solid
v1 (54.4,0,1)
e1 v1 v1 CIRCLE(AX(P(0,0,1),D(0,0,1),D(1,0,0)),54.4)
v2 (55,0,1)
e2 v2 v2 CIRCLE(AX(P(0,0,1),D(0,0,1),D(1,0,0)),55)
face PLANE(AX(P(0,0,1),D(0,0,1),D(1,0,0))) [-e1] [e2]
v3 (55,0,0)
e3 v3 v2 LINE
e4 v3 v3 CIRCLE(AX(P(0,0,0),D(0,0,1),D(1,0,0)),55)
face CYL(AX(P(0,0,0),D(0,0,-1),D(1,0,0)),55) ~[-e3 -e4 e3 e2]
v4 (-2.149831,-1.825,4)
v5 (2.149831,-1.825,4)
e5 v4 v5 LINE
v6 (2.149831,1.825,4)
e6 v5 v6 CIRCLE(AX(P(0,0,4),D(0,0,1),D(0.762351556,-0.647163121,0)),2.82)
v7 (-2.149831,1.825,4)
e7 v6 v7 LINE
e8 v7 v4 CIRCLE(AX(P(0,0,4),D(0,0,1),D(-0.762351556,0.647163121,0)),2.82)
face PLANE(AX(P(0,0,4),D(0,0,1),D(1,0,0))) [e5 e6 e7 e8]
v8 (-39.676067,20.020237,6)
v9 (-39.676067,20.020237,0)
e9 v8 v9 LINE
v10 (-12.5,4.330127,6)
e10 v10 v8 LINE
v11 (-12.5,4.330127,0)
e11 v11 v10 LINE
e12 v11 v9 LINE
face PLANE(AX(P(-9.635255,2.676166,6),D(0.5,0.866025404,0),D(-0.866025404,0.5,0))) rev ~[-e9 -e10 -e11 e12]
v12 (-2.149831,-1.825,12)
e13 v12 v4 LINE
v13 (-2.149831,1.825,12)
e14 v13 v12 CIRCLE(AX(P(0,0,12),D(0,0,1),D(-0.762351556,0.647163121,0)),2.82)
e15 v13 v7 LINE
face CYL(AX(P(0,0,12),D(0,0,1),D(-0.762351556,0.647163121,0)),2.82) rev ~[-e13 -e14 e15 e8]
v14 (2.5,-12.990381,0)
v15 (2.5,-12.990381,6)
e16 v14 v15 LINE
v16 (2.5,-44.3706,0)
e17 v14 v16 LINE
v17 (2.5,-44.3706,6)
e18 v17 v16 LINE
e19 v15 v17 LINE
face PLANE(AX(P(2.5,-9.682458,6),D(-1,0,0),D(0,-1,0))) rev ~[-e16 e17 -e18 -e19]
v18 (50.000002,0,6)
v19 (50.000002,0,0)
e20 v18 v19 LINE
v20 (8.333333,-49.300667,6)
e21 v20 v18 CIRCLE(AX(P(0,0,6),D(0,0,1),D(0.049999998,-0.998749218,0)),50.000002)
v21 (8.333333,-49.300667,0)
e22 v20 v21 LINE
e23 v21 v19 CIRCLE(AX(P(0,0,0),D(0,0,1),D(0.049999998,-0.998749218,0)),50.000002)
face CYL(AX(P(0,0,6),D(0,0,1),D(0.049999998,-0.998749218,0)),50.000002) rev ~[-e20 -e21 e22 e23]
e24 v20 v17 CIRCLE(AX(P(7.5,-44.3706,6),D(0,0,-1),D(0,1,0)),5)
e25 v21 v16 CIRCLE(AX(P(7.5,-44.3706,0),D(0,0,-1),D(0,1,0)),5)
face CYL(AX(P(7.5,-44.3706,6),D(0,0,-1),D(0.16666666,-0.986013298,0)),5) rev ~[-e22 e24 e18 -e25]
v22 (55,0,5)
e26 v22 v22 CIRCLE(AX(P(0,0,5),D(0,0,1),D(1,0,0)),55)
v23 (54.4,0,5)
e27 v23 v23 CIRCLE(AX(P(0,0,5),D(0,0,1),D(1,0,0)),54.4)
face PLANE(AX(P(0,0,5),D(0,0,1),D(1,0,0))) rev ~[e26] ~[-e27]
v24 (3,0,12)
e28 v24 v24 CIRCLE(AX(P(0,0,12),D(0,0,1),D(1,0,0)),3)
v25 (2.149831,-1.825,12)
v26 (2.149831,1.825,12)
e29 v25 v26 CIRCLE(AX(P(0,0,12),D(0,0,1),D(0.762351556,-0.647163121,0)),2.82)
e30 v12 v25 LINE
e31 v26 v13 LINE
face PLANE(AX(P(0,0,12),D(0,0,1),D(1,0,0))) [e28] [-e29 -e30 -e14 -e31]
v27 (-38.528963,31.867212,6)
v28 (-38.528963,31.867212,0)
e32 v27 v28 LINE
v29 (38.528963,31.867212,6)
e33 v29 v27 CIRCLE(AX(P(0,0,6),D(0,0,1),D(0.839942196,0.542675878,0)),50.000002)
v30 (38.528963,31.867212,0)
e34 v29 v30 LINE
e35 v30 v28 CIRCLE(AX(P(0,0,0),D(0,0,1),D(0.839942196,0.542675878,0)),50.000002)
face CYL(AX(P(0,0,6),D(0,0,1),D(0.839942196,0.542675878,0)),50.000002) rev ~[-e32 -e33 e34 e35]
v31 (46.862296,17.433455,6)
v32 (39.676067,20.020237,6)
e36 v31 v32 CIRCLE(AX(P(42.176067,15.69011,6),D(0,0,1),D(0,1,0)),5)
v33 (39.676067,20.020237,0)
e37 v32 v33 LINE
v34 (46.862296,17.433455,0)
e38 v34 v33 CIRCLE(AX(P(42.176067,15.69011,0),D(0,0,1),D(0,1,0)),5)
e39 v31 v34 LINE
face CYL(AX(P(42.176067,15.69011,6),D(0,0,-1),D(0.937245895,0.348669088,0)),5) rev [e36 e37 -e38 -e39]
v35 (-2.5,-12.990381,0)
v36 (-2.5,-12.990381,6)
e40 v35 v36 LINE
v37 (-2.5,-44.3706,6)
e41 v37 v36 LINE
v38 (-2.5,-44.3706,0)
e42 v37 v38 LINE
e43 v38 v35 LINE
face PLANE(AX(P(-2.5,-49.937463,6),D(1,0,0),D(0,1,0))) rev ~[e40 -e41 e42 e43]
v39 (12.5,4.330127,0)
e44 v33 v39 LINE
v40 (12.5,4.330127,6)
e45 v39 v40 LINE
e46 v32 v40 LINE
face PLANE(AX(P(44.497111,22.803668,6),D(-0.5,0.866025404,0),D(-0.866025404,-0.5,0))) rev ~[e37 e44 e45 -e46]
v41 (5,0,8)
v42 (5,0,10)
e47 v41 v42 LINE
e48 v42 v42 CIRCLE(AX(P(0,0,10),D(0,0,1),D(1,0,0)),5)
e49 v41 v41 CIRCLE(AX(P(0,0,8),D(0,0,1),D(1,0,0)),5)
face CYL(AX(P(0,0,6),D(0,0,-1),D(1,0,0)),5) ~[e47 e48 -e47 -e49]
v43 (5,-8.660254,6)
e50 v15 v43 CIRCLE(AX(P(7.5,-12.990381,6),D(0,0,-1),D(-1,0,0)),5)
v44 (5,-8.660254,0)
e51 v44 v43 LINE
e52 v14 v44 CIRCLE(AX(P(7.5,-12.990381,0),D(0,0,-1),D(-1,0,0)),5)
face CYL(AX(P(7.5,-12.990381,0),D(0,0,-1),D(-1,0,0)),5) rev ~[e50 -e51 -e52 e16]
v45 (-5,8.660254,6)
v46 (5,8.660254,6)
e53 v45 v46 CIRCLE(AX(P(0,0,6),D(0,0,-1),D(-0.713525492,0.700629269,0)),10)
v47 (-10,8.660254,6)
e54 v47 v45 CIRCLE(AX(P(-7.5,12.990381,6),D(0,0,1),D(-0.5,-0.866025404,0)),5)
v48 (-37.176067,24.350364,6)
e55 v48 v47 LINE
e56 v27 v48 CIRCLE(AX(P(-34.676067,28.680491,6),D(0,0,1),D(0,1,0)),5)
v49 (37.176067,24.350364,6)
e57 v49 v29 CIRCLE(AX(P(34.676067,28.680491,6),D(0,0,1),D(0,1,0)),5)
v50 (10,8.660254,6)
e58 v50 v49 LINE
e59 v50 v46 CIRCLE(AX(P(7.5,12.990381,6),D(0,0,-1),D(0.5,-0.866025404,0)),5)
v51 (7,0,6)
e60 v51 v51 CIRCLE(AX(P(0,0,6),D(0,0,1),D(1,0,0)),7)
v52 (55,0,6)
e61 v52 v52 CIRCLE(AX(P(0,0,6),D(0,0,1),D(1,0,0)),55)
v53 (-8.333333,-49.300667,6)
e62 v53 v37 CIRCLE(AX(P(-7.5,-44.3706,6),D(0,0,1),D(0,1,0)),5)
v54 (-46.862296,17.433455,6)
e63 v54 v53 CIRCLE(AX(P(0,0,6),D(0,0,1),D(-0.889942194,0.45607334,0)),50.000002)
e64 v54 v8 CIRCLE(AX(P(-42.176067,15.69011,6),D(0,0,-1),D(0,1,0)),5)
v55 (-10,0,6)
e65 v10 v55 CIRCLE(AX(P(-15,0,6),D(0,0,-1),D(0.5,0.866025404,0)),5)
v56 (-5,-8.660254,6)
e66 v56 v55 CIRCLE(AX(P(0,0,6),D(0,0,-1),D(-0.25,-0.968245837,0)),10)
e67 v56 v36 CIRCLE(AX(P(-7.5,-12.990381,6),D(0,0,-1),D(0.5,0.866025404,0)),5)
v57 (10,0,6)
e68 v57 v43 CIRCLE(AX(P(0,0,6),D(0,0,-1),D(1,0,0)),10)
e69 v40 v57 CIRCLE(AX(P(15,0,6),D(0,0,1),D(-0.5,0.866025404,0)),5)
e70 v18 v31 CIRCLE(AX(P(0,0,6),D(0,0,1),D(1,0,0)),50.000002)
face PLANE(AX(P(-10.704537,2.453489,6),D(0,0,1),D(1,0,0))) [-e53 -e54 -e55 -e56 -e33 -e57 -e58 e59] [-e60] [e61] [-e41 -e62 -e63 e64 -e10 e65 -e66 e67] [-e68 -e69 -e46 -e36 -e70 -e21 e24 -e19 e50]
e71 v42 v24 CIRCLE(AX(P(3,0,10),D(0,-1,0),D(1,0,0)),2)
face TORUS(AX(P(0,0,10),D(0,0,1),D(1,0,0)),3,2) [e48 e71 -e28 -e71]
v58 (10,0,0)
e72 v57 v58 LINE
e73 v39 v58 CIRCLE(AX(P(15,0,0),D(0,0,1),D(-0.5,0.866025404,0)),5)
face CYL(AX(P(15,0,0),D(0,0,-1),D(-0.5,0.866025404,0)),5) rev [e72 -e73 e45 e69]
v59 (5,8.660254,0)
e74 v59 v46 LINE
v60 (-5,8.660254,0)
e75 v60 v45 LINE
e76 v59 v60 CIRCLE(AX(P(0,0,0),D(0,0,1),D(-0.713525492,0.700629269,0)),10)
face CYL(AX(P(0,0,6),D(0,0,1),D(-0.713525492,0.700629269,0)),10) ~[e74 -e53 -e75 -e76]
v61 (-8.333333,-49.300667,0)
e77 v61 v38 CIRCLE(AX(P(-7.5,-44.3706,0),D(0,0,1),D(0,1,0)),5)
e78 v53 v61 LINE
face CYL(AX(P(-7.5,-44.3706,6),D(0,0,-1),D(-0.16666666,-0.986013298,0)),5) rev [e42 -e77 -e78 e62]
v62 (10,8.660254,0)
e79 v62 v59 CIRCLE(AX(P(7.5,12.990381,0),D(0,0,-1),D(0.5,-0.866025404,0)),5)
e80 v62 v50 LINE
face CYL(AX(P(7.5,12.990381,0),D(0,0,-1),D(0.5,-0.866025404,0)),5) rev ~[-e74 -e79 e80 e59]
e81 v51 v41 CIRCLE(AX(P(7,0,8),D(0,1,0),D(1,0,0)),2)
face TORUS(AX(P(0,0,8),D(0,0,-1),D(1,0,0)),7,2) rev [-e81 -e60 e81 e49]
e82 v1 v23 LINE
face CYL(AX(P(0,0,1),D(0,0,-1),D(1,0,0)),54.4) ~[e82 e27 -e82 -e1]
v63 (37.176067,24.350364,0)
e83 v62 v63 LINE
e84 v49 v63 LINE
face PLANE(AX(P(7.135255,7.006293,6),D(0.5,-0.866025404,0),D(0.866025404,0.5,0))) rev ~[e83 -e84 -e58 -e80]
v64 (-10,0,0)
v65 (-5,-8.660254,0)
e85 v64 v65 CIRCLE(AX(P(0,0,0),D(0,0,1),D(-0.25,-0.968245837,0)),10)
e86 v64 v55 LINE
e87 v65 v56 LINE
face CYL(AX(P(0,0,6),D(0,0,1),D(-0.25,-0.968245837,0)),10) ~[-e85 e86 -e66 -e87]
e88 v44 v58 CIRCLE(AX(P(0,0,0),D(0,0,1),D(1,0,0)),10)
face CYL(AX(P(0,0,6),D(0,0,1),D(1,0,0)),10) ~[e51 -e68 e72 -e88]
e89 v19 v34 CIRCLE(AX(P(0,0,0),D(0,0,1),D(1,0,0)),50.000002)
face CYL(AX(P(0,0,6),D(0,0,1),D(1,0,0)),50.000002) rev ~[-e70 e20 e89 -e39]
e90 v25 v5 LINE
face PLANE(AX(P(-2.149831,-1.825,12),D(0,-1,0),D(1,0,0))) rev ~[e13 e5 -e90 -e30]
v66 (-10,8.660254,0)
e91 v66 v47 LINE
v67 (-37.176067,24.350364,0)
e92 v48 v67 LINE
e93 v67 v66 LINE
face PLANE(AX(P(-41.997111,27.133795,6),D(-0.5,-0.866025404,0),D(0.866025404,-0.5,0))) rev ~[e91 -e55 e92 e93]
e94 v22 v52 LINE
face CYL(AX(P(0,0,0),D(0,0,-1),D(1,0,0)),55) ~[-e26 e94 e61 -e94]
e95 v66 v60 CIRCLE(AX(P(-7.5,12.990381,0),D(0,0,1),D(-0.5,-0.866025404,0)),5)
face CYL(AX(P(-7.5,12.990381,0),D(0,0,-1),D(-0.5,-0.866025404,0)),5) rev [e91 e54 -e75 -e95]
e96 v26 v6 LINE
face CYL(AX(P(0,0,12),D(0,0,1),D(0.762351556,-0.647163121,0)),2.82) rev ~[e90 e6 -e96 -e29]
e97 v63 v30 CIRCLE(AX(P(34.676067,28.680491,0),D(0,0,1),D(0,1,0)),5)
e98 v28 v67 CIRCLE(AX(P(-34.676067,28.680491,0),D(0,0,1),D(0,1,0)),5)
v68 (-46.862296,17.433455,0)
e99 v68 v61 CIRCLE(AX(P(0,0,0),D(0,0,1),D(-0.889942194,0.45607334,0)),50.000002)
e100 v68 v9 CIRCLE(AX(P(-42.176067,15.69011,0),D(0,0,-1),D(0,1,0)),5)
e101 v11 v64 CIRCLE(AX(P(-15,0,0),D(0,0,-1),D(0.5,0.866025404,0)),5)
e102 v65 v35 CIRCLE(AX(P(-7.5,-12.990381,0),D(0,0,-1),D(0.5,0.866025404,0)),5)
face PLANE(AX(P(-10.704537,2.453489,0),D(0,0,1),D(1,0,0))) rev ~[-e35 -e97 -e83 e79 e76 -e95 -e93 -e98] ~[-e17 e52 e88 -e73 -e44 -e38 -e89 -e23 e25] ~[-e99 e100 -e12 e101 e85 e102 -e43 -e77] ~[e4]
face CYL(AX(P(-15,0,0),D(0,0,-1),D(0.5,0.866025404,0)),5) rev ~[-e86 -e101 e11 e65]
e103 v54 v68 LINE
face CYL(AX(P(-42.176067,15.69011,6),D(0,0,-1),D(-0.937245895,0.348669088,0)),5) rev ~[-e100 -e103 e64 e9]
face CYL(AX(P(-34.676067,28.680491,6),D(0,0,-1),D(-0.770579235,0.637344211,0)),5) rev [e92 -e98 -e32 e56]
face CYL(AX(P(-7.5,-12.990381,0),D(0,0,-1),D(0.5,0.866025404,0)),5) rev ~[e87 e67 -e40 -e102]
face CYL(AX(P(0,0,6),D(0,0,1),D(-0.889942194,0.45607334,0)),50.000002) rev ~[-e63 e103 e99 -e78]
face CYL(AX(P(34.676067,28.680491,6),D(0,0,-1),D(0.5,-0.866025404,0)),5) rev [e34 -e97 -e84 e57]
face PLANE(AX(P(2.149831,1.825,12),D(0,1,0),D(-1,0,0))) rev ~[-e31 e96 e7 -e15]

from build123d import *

# Parameters (mm, degrees)
F0_R         = 55
F1_DEPTH     = 6
F2_R         = 5
F3_DEPTH     = 6
F5_DEPTH     = 8
F7_R         = 55
F7_R_2       = 54.4
F8_DEPTH     = 4
F10_DEPTH    = 25
F11_R        = 5
F12_T1_DEPTH = 6
F13_R        = 2


# Not quite as in the source:
# - a fillet or chamfer that OpenCascade refuses, or shapes differently, is made with other operations: its cross-section is extruded or revolved along the edge and cut away or added


with BuildPart() as f1:
    # F0 (on Top) → F1 (new body)
    with BuildSketch(Plane.XY):
        Circle(F0_R)
    extrude(amount=F1_DEPTH)

    # F2 (on face) → F3 (join)
    with BuildSketch(Plane.XY.offset(6)):
        Circle(F2_R)
    extrude(amount=F3_DEPTH)

    # F4 (on face) → F5 (cut)
    with BuildSketch(Plane.XY.offset(12)):
        with BuildLine():
            Line((2.1498313887, 1.825), (-2.1498313887, 1.825))
            ThreePointArc((-2.1498313887, 1.825), (-2.82, 0), (-2.1498313887, -1.825))
            Line((-2.1498313887, -1.825), (2.1498313887, -1.825))
            ThreePointArc((2.1498313887, -1.825), (2.82, 0), (2.1498313887, 1.825))
        make_face()
    extrude(amount=-F5_DEPTH, mode=Mode.SUBTRACT)

    # F7 (on offset) → F8 (cut)
    with BuildSketch(Plane.XY.offset(1)):
        Circle(F7_R)
        Circle(F7_R_2, mode=Mode.SUBTRACT)
    extrude(amount=F8_DEPTH, mode=Mode.SUBTRACT)

    # F9 (on face) → F10 (cut)
    with BuildSketch(Plane.XY.offset(6)):
        with BuildLine():
            Line((7.1352549156, 7.0062926922), (41.9971112805, 27.1337948489))
            ThreePointArc((41.9971112805, 27.1337948489), (0, 50.0000017881), (-41.9971112805, 27.1337948489))
            Line((-41.9971112805, 27.1337948489), (-7.1352549156, 7.0062926922))
            ThreePointArc((-7.1352549156, 7.0062926922), (0, 10), (7.1352549156, 7.0062926922))
        make_face()
        with BuildLine():
            ThreePointArc((2.5, -49.937462679), (36.2284431303, -34.460123145), (50.0000017881, 0))
            ThreePointArc((50.0000017881, 0), (48.6048136629, 11.729120496), (44.4971112805, 22.80366783))
            Line((44.4971112805, 22.80366783), (9.6352549156, 2.6761656733))
            ThreePointArc((9.6352549156, 2.6761656733), (9.9083941473, 1.3504537837), (10, 0))
            ThreePointArc((10, 0), (7.9056941504, -6.123724357), (2.5, -9.6824583655))
            Line((2.5, -9.6824583655), (2.5, -49.937462679))
        make_face()
        with BuildLine():
            ThreePointArc((-44.4971112805, 22.80366783), (-43.3012717378, -25.0000008941), (-2.5, -49.937462679))
            Line((-2.5, -49.937462679), (-2.5, -9.6824583655))
            ThreePointArc((-2.5, -9.6824583655), (-8.6602540378, -5), (-9.6352549156, 2.6761656733))
            Line((-9.6352549156, 2.6761656733), (-44.4971112805, 22.80366783))
        make_face()
    extrude(amount=-F10_DEPTH, mode=Mode.SUBTRACT)

    # F11
    f11_edges = [f1.edges().sort_by_distance(p)[0] for p in [
        (-44.497111, 22.803668, 3),
        (-41.997111, 27.133795, 3),
        (41.997111, 27.133795, 3),
        (44.497111, 22.803668, 3),
        (2.5, -49.937463, 3),
        (-2.5, -49.937463, 3),
    ]]
    fillet(f11_edges, radius=F11_R)

    # F12: fillet of radius 5 on 6 edges, made by hand

    # F12_s2 → F12_t1 (join)
    with BuildSketch(Plane.XY):
        with BuildLine():
            ThreePointArc((-12.5, 4.3301270189), (-10.6698729811, 2.5), (-10, 0))
            ThreePointArc((-10, 0), (-9.9083941473, 1.3504537837), (-9.6352549156, 2.6761656733))
            Line((-9.6352549156, 2.6761656733), (-12.5, 4.3301270189))
        make_face()
        with BuildLine():
            ThreePointArc((-5, -8.6602540378), (-3.1698729811, -10.4903810568), (-2.5, -12.9903810568))
            Line((-2.5, -12.9903810568), (-2.5, -9.6824583655))
            ThreePointArc((-2.5, -9.6824583655), (-3.7846697903, -9.2561479341), (-5, -8.6602540378))
        make_face()
        with BuildLine():
            ThreePointArc((2.5, -12.9903810568), (3.1698729811, -10.4903810568), (5, -8.6602540378))
            ThreePointArc((5, -8.6602540378), (3.7846697903, -9.2561479341), (2.5, -9.6824583655))
            Line((2.5, -9.6824583655), (2.5, -12.9903810568))
        make_face()
        with BuildLine():
            ThreePointArc((12.5, 4.3301270189), (10.6698729811, 2.5), (10, 0))
            ThreePointArc((10, 0), (9.9083941473, 1.3504537837), (9.6352549156, 2.6761656733))
            Line((9.6352549156, 2.6761656733), (12.5, 4.3301270189))
        make_face()
        with BuildLine():
            ThreePointArc((10, 8.6602540378), (7.5, 7.9903810568), (5, 8.6602540378))
            ThreePointArc((5, 8.6602540378), (6.123724357, 7.9056941504), (7.1352549156, 7.0062926922))
            Line((7.1352549156, 7.0062926922), (10, 8.6602540378))
        make_face()
        with BuildLine():
            ThreePointArc((-10, 8.6602540378), (-7.5, 7.9903810568), (-5, 8.6602540378))
            ThreePointArc((-5, 8.6602540378), (-6.123724357, 7.9056941504), (-7.1352549156, 7.0062926922))
            Line((-7.1352549156, 7.0062926922), (-10, 8.6602540378))
        make_face()
    extrude(amount=F12_T1_DEPTH)

    # F13
    f13_edges = [f1.edges().sort_by_distance(p)[0] for p in [
        (-5, 0, 6),
        (-5, 0, 12),
    ]]
    fillet(f13_edges, radius=F13_R)


solid = f1.part
